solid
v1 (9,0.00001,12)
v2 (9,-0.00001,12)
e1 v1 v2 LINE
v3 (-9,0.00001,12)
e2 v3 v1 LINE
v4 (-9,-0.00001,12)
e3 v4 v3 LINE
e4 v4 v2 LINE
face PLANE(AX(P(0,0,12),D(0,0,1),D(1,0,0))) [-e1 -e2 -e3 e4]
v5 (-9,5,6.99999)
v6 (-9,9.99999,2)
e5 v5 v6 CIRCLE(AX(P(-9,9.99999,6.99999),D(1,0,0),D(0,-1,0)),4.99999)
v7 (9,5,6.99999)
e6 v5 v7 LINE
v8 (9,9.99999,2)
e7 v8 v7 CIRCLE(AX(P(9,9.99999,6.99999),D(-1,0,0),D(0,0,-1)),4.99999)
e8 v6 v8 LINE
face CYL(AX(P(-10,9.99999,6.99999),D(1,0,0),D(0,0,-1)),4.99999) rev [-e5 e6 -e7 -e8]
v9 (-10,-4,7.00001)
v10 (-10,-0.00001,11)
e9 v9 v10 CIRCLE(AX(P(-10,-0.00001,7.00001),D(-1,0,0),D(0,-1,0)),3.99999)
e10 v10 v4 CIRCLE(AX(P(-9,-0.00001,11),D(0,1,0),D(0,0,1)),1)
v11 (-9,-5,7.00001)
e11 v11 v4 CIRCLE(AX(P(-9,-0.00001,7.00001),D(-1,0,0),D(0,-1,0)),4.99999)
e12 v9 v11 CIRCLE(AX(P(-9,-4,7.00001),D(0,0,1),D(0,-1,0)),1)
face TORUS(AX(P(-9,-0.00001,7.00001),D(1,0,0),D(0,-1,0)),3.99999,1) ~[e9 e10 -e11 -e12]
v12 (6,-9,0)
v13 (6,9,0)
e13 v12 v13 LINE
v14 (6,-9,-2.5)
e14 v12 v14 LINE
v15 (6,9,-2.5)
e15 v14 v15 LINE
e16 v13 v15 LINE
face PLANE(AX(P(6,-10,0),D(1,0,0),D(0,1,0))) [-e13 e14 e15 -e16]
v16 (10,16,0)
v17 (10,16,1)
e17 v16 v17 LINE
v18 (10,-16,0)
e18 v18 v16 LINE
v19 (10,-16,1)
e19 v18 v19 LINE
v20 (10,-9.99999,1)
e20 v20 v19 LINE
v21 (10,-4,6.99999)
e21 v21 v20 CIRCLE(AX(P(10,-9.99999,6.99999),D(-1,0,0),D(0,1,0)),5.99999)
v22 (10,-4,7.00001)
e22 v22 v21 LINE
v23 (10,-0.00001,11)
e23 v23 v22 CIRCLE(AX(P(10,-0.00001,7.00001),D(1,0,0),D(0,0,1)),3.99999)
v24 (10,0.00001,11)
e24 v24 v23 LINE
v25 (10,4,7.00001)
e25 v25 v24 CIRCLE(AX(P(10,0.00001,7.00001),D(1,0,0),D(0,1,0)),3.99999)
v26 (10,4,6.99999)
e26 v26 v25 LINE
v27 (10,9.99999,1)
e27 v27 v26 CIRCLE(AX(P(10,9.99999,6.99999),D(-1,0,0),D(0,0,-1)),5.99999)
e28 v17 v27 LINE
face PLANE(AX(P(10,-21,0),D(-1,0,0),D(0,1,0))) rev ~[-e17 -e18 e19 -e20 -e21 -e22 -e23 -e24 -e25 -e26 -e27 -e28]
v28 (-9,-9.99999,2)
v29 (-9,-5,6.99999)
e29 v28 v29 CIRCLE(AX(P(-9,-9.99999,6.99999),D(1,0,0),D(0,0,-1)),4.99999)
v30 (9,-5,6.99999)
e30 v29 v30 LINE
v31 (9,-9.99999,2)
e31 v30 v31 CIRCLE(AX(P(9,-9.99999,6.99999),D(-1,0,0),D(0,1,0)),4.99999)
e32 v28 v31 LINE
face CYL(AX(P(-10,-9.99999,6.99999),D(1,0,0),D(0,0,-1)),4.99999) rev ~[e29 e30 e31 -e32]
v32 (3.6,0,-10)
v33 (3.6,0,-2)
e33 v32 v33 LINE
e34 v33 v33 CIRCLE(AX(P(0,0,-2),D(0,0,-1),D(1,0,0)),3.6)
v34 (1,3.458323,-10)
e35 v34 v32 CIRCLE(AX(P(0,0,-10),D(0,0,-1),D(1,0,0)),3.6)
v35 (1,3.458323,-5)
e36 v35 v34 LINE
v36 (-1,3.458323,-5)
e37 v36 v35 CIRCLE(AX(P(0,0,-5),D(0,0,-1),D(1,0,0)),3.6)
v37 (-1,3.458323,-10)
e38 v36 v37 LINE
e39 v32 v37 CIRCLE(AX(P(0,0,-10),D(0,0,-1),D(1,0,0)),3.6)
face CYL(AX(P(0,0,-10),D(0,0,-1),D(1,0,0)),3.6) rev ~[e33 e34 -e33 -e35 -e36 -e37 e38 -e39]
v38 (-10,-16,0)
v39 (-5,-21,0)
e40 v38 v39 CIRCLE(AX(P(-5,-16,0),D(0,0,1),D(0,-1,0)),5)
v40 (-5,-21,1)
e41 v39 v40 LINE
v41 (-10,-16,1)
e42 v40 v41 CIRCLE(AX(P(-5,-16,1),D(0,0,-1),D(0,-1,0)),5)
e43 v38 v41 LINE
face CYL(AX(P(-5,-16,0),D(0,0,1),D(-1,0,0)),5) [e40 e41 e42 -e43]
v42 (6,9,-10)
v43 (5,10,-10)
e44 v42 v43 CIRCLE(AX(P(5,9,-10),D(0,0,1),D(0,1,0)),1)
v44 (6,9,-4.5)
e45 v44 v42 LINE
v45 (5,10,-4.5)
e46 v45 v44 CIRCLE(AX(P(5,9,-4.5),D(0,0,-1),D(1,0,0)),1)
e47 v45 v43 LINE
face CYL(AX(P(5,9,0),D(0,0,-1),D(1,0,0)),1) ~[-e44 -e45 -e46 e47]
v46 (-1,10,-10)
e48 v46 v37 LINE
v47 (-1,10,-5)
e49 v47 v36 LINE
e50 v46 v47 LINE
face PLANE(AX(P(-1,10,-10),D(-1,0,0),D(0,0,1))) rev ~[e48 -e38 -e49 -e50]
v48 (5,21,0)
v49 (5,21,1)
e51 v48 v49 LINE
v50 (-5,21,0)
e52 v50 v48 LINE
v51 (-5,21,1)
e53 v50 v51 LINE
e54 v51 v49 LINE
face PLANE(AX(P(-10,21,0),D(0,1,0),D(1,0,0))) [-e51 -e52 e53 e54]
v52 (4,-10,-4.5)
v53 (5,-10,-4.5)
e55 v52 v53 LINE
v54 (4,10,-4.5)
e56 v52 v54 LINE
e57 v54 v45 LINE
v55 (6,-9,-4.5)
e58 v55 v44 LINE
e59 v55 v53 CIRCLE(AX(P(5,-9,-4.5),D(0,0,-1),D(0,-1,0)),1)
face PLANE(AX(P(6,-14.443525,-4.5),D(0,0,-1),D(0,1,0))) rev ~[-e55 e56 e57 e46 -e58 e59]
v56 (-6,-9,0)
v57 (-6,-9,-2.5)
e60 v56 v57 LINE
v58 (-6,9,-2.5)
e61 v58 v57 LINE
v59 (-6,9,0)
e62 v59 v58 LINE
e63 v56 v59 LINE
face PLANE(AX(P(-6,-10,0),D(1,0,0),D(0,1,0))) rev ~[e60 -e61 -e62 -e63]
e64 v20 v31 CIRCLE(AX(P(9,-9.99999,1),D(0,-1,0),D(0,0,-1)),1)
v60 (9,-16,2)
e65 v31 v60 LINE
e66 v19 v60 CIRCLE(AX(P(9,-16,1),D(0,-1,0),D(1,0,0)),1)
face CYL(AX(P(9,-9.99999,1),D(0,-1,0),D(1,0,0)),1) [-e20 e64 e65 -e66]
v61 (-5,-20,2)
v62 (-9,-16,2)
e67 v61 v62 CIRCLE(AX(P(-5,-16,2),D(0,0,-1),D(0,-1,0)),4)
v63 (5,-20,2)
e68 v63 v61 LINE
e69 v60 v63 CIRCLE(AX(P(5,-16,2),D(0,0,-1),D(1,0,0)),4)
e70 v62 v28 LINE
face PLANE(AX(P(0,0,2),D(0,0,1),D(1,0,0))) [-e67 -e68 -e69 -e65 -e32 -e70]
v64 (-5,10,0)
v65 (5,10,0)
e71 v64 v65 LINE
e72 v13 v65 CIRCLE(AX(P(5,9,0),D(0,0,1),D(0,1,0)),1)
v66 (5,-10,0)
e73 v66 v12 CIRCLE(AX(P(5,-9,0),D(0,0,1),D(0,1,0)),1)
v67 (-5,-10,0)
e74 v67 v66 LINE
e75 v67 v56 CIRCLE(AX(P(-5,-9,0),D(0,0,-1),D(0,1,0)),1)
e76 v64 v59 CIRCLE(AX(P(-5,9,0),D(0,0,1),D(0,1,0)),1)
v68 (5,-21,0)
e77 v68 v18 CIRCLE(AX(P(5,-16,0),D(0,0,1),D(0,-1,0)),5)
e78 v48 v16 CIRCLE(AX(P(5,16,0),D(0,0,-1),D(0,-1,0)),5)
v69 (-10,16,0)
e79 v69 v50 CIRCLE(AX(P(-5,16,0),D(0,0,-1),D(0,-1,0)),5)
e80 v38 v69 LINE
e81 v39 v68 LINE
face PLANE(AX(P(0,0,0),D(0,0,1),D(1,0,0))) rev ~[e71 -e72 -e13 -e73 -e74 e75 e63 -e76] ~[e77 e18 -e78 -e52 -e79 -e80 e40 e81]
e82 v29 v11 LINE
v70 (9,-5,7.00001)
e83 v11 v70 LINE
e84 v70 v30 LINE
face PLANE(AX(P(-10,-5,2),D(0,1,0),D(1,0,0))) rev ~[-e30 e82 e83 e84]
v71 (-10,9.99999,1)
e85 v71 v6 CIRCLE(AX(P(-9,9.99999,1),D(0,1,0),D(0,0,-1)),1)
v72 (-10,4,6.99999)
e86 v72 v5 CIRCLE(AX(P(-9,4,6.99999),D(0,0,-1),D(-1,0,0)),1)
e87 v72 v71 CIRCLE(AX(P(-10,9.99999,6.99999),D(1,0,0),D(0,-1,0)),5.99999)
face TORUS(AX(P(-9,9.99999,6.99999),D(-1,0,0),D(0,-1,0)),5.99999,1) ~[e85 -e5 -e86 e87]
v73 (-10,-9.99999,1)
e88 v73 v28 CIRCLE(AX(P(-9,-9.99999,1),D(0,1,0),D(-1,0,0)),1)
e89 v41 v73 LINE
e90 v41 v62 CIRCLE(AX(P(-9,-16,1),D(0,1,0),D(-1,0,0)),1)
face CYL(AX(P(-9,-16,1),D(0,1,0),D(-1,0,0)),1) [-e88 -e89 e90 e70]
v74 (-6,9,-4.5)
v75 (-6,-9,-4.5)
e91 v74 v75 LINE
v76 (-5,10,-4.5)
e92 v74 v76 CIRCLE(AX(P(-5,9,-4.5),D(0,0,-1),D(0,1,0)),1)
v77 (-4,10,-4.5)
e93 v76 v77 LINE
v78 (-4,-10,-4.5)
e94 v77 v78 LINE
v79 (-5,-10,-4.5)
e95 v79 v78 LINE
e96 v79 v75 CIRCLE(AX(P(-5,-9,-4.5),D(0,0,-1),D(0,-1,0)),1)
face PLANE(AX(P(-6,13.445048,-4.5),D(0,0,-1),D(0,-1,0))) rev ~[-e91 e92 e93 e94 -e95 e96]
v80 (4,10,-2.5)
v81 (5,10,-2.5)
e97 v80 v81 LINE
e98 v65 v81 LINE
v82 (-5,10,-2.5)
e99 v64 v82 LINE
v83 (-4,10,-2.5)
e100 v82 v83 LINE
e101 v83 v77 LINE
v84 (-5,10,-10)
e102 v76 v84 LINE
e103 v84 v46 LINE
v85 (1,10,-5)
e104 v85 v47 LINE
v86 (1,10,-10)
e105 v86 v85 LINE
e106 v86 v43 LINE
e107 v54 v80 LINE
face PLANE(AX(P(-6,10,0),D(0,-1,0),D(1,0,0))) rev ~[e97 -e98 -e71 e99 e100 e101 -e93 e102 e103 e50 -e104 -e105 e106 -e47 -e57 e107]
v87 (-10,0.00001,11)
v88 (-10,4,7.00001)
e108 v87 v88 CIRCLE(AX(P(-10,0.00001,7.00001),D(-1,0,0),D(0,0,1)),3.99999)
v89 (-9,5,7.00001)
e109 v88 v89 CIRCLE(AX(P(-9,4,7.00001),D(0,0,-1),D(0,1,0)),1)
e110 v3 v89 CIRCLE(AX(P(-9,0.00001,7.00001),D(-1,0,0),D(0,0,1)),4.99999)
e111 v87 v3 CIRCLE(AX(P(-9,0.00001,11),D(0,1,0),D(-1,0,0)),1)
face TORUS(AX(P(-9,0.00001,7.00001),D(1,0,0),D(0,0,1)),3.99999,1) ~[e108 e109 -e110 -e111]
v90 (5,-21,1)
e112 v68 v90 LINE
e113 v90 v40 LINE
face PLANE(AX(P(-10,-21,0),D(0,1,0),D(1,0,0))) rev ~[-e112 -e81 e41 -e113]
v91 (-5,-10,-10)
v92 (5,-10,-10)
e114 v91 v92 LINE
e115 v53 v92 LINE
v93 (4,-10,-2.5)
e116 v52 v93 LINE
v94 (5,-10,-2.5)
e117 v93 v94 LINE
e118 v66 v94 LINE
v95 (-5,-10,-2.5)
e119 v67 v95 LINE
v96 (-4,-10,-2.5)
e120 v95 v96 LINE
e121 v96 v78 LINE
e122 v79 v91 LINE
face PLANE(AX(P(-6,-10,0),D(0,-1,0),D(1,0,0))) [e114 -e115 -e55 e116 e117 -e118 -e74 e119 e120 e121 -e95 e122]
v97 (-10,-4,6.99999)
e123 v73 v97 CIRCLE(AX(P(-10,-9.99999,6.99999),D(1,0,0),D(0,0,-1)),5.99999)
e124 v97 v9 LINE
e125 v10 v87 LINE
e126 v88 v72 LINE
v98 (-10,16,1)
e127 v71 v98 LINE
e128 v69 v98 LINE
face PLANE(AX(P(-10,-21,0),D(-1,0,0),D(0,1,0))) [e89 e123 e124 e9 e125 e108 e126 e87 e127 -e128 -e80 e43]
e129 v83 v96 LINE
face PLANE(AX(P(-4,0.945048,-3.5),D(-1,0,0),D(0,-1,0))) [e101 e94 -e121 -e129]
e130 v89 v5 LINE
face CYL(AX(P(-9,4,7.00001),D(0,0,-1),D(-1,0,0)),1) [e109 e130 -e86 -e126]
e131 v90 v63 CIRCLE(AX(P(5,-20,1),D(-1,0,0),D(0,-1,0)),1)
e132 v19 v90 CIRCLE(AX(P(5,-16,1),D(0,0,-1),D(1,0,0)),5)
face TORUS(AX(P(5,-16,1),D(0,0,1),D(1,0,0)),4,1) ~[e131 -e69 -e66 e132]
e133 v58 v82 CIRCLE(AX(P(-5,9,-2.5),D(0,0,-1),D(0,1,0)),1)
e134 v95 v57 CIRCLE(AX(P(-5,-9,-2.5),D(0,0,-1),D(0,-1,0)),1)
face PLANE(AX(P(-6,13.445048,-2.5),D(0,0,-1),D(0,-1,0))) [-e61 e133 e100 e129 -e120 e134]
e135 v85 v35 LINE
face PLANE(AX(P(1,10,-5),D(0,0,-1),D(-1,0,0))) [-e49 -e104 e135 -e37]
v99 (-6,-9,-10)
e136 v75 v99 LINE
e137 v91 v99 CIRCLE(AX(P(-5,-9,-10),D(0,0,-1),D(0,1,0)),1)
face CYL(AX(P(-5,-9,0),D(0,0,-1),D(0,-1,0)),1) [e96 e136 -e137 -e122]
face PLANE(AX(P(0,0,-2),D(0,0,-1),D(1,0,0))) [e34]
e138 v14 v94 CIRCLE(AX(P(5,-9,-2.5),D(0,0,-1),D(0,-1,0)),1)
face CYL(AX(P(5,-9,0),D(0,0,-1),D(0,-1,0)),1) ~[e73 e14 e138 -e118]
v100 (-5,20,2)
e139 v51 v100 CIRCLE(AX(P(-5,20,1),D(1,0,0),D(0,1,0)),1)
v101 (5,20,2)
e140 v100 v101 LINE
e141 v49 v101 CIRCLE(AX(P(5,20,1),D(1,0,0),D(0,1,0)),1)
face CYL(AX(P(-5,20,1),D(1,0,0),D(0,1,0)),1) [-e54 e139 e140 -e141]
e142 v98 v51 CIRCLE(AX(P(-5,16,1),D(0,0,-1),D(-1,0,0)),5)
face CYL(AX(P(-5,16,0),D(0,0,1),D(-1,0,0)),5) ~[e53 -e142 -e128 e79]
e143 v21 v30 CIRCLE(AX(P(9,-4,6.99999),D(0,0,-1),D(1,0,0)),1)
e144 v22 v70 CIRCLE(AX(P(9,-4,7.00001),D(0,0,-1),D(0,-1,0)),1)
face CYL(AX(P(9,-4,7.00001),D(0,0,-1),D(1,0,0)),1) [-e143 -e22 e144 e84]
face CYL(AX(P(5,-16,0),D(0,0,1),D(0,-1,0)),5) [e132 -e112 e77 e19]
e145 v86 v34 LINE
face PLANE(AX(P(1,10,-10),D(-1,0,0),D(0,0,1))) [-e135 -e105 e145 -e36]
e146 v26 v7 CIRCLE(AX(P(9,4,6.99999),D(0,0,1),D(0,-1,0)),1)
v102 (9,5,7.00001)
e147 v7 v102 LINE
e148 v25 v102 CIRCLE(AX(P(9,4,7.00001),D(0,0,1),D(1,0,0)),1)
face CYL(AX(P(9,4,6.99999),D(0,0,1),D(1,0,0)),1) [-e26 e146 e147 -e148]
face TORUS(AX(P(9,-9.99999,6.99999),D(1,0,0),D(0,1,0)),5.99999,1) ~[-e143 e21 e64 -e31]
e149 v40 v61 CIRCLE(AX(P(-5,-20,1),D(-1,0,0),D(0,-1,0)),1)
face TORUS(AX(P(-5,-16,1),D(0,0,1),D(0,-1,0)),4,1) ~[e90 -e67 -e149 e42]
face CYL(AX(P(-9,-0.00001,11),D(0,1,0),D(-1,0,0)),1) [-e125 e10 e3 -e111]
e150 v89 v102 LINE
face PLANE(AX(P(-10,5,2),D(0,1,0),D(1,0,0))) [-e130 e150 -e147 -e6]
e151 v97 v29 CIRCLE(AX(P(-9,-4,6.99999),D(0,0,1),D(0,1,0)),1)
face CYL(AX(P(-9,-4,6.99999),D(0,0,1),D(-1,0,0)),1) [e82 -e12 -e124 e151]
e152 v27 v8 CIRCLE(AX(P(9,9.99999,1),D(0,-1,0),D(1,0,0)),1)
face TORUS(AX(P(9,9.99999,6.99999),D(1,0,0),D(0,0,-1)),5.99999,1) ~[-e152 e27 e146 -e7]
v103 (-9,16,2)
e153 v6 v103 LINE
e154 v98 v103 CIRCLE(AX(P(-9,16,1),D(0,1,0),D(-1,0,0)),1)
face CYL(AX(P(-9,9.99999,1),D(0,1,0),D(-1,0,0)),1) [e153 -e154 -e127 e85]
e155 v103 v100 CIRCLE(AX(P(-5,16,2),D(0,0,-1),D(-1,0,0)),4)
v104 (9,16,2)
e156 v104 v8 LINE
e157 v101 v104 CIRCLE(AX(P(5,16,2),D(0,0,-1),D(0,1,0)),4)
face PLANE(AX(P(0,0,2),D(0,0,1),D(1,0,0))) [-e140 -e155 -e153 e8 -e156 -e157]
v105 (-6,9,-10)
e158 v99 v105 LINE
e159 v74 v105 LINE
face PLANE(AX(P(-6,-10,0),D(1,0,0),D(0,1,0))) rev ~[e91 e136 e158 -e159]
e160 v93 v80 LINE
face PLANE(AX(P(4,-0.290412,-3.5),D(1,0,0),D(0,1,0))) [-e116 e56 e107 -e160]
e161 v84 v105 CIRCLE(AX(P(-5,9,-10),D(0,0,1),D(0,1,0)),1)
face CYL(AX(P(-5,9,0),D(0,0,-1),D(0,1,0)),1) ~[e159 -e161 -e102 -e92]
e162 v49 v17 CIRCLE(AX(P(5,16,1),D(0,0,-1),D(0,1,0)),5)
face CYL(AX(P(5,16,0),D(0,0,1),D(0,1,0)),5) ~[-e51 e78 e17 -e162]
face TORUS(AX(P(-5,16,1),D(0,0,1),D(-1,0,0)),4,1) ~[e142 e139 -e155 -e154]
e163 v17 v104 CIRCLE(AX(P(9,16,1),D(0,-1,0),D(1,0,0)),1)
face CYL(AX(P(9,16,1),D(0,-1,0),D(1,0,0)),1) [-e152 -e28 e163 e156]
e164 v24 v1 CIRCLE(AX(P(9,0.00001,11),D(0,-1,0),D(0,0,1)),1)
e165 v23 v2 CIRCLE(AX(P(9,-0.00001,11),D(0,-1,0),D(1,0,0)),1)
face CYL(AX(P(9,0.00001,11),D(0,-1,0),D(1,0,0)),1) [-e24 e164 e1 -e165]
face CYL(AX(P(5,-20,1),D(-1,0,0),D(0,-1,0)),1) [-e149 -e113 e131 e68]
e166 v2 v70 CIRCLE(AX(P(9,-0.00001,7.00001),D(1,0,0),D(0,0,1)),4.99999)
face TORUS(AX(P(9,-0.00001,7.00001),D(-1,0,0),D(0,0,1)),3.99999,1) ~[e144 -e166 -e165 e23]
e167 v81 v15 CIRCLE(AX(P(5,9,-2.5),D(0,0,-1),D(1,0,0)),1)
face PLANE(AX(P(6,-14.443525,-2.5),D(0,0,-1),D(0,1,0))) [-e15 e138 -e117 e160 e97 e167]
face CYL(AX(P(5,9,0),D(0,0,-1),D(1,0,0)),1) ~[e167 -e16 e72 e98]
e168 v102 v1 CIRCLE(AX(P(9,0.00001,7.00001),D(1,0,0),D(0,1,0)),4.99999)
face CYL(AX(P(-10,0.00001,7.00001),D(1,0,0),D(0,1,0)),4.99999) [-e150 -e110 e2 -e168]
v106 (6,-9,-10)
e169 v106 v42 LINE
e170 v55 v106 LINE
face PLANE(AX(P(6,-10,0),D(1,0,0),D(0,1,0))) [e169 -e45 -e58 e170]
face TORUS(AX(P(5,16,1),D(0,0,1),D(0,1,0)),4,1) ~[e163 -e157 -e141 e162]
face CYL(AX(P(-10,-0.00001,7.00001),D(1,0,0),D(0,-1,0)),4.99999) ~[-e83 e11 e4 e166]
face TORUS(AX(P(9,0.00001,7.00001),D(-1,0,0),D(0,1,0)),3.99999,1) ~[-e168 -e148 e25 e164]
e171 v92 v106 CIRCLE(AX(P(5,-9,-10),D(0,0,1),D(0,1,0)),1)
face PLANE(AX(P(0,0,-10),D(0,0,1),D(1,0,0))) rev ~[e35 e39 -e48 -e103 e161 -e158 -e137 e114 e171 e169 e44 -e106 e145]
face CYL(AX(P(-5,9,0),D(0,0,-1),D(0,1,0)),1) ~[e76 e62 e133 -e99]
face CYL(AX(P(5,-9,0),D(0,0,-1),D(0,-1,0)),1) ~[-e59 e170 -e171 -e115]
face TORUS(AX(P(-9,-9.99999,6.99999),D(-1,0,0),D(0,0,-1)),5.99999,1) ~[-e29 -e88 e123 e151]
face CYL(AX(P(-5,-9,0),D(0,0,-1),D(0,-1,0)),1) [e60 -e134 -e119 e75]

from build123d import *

# Parameters (mm, degrees)
F0_W      = 20
F0_H      = 42
F1_DEPTH  = 2
F2_W      = 12
F2_H      = 20
F3_DEPTH  = 10
F4_R      = 1
F5_W      = 20
F5_H      = 10
F6_DEPTH  = 10
F7_R      = 4.99999
F8_R      = 3.6
F9_DEPTH  = 8
F10_W     = 2
F10_H     = 5
F11_DEPTH = 7
F12_R     = 5
F13_W     = 25
F13_H     = 2
F14_DEPTH = 2
F15_W     = 28.3062260176
F15_H     = 2
F16_DEPTH = 2
F17_R     = 1


# Not quite as in the source:
# - a fillet or chamfer is up to 0.001 mm smaller than in the source, because OpenCascade refuses the exact size


with BuildPart() as f1:
    # F0 (on Top) → F1 (new body)
    with BuildSketch(Plane.XY):
        Rectangle(F0_W, F0_H)
    extrude(amount=F1_DEPTH)

    # F2 (on Top) → F3 (join)
    with BuildSketch(Plane.XY):
        Rectangle(F2_W, F2_H)
    extrude(amount=-F3_DEPTH)

    # F4
    f4_edges = [f1.edges().sort_by_distance(p)[0] for p in [
        (-6, -10, -5),
        (6, -10, -5),
        (-6, 10, -5),
        (6, 10, -5),
    ]]
    fillet(f4_edges, radius=F4_R)

    # F5 (on face) → F6 (join)
    with BuildSketch(Plane.XY.offset(2)):
        Rectangle(F5_W, F5_H)
    extrude(amount=F6_DEPTH)

    # F7 (radius 5 in the source; OpenCascade refuses exactly that, so slightly less here)
    f7_edges = [f1.edges().sort_by_distance(p)[0] for p in [
        (0, -5, 12),
        (0, 5, 12),
        (0, -5, 2),
        (0, 5, 2),
    ]]
    fillet(f7_edges, radius=F7_R)

    # F8 (on face) → F9 (cut)
    with BuildSketch(Plane(origin=(0, 0, -10), x_dir=(1, 0, 0), z_dir=(0, 0, -1))):
        Circle(F8_R)
    extrude(amount=-F9_DEPTH, mode=Mode.SUBTRACT)

    # F10 (on face) → F11 (cut)
    with BuildSketch(Plane(origin=(0, 10, 0), x_dir=(-1, 0, 0), z_dir=(0, 1, 0))):
        with Locations((0, -7.5)):
            Rectangle(F10_W, F10_H)
    extrude(amount=-F11_DEPTH, mode=Mode.SUBTRACT)

    # F12
    f12_edges = [f1.edges().sort_by_distance(p)[0] for p in [
        (10, -21, 1),
        (-10, 21, 1),
        (10, 21, 1),
        (-10, -21, 1),
    ]]
    fillet(f12_edges, radius=F12_R)

    # F13 (on face) → F14 (cut)
    with BuildSketch(Plane(origin=(-6, 0, 0), x_dir=(0, -1, 0), z_dir=(-1, 0, 0))):
        with Locations((-0.9450479232, -3.5)):
            Rectangle(F13_W, F13_H)
    extrude(amount=-F14_DEPTH, mode=Mode.SUBTRACT)

    # F15 (on face) → F16 (cut)
    with BuildSketch(Plane.YZ.offset(6)):
        with Locations((-0.2904124558, -3.5)):
            Rectangle(F15_W, F15_H)
    extrude(amount=-F16_DEPTH, mode=Mode.SUBTRACT)

    # F17
    f17_edges = [f1.edges().sort_by_distance(p)[0] for p in [
        (-10, -3.535537, 10.535537),
    ]]
    fillet(f17_edges, radius=F17_R)


solid = f1.part
